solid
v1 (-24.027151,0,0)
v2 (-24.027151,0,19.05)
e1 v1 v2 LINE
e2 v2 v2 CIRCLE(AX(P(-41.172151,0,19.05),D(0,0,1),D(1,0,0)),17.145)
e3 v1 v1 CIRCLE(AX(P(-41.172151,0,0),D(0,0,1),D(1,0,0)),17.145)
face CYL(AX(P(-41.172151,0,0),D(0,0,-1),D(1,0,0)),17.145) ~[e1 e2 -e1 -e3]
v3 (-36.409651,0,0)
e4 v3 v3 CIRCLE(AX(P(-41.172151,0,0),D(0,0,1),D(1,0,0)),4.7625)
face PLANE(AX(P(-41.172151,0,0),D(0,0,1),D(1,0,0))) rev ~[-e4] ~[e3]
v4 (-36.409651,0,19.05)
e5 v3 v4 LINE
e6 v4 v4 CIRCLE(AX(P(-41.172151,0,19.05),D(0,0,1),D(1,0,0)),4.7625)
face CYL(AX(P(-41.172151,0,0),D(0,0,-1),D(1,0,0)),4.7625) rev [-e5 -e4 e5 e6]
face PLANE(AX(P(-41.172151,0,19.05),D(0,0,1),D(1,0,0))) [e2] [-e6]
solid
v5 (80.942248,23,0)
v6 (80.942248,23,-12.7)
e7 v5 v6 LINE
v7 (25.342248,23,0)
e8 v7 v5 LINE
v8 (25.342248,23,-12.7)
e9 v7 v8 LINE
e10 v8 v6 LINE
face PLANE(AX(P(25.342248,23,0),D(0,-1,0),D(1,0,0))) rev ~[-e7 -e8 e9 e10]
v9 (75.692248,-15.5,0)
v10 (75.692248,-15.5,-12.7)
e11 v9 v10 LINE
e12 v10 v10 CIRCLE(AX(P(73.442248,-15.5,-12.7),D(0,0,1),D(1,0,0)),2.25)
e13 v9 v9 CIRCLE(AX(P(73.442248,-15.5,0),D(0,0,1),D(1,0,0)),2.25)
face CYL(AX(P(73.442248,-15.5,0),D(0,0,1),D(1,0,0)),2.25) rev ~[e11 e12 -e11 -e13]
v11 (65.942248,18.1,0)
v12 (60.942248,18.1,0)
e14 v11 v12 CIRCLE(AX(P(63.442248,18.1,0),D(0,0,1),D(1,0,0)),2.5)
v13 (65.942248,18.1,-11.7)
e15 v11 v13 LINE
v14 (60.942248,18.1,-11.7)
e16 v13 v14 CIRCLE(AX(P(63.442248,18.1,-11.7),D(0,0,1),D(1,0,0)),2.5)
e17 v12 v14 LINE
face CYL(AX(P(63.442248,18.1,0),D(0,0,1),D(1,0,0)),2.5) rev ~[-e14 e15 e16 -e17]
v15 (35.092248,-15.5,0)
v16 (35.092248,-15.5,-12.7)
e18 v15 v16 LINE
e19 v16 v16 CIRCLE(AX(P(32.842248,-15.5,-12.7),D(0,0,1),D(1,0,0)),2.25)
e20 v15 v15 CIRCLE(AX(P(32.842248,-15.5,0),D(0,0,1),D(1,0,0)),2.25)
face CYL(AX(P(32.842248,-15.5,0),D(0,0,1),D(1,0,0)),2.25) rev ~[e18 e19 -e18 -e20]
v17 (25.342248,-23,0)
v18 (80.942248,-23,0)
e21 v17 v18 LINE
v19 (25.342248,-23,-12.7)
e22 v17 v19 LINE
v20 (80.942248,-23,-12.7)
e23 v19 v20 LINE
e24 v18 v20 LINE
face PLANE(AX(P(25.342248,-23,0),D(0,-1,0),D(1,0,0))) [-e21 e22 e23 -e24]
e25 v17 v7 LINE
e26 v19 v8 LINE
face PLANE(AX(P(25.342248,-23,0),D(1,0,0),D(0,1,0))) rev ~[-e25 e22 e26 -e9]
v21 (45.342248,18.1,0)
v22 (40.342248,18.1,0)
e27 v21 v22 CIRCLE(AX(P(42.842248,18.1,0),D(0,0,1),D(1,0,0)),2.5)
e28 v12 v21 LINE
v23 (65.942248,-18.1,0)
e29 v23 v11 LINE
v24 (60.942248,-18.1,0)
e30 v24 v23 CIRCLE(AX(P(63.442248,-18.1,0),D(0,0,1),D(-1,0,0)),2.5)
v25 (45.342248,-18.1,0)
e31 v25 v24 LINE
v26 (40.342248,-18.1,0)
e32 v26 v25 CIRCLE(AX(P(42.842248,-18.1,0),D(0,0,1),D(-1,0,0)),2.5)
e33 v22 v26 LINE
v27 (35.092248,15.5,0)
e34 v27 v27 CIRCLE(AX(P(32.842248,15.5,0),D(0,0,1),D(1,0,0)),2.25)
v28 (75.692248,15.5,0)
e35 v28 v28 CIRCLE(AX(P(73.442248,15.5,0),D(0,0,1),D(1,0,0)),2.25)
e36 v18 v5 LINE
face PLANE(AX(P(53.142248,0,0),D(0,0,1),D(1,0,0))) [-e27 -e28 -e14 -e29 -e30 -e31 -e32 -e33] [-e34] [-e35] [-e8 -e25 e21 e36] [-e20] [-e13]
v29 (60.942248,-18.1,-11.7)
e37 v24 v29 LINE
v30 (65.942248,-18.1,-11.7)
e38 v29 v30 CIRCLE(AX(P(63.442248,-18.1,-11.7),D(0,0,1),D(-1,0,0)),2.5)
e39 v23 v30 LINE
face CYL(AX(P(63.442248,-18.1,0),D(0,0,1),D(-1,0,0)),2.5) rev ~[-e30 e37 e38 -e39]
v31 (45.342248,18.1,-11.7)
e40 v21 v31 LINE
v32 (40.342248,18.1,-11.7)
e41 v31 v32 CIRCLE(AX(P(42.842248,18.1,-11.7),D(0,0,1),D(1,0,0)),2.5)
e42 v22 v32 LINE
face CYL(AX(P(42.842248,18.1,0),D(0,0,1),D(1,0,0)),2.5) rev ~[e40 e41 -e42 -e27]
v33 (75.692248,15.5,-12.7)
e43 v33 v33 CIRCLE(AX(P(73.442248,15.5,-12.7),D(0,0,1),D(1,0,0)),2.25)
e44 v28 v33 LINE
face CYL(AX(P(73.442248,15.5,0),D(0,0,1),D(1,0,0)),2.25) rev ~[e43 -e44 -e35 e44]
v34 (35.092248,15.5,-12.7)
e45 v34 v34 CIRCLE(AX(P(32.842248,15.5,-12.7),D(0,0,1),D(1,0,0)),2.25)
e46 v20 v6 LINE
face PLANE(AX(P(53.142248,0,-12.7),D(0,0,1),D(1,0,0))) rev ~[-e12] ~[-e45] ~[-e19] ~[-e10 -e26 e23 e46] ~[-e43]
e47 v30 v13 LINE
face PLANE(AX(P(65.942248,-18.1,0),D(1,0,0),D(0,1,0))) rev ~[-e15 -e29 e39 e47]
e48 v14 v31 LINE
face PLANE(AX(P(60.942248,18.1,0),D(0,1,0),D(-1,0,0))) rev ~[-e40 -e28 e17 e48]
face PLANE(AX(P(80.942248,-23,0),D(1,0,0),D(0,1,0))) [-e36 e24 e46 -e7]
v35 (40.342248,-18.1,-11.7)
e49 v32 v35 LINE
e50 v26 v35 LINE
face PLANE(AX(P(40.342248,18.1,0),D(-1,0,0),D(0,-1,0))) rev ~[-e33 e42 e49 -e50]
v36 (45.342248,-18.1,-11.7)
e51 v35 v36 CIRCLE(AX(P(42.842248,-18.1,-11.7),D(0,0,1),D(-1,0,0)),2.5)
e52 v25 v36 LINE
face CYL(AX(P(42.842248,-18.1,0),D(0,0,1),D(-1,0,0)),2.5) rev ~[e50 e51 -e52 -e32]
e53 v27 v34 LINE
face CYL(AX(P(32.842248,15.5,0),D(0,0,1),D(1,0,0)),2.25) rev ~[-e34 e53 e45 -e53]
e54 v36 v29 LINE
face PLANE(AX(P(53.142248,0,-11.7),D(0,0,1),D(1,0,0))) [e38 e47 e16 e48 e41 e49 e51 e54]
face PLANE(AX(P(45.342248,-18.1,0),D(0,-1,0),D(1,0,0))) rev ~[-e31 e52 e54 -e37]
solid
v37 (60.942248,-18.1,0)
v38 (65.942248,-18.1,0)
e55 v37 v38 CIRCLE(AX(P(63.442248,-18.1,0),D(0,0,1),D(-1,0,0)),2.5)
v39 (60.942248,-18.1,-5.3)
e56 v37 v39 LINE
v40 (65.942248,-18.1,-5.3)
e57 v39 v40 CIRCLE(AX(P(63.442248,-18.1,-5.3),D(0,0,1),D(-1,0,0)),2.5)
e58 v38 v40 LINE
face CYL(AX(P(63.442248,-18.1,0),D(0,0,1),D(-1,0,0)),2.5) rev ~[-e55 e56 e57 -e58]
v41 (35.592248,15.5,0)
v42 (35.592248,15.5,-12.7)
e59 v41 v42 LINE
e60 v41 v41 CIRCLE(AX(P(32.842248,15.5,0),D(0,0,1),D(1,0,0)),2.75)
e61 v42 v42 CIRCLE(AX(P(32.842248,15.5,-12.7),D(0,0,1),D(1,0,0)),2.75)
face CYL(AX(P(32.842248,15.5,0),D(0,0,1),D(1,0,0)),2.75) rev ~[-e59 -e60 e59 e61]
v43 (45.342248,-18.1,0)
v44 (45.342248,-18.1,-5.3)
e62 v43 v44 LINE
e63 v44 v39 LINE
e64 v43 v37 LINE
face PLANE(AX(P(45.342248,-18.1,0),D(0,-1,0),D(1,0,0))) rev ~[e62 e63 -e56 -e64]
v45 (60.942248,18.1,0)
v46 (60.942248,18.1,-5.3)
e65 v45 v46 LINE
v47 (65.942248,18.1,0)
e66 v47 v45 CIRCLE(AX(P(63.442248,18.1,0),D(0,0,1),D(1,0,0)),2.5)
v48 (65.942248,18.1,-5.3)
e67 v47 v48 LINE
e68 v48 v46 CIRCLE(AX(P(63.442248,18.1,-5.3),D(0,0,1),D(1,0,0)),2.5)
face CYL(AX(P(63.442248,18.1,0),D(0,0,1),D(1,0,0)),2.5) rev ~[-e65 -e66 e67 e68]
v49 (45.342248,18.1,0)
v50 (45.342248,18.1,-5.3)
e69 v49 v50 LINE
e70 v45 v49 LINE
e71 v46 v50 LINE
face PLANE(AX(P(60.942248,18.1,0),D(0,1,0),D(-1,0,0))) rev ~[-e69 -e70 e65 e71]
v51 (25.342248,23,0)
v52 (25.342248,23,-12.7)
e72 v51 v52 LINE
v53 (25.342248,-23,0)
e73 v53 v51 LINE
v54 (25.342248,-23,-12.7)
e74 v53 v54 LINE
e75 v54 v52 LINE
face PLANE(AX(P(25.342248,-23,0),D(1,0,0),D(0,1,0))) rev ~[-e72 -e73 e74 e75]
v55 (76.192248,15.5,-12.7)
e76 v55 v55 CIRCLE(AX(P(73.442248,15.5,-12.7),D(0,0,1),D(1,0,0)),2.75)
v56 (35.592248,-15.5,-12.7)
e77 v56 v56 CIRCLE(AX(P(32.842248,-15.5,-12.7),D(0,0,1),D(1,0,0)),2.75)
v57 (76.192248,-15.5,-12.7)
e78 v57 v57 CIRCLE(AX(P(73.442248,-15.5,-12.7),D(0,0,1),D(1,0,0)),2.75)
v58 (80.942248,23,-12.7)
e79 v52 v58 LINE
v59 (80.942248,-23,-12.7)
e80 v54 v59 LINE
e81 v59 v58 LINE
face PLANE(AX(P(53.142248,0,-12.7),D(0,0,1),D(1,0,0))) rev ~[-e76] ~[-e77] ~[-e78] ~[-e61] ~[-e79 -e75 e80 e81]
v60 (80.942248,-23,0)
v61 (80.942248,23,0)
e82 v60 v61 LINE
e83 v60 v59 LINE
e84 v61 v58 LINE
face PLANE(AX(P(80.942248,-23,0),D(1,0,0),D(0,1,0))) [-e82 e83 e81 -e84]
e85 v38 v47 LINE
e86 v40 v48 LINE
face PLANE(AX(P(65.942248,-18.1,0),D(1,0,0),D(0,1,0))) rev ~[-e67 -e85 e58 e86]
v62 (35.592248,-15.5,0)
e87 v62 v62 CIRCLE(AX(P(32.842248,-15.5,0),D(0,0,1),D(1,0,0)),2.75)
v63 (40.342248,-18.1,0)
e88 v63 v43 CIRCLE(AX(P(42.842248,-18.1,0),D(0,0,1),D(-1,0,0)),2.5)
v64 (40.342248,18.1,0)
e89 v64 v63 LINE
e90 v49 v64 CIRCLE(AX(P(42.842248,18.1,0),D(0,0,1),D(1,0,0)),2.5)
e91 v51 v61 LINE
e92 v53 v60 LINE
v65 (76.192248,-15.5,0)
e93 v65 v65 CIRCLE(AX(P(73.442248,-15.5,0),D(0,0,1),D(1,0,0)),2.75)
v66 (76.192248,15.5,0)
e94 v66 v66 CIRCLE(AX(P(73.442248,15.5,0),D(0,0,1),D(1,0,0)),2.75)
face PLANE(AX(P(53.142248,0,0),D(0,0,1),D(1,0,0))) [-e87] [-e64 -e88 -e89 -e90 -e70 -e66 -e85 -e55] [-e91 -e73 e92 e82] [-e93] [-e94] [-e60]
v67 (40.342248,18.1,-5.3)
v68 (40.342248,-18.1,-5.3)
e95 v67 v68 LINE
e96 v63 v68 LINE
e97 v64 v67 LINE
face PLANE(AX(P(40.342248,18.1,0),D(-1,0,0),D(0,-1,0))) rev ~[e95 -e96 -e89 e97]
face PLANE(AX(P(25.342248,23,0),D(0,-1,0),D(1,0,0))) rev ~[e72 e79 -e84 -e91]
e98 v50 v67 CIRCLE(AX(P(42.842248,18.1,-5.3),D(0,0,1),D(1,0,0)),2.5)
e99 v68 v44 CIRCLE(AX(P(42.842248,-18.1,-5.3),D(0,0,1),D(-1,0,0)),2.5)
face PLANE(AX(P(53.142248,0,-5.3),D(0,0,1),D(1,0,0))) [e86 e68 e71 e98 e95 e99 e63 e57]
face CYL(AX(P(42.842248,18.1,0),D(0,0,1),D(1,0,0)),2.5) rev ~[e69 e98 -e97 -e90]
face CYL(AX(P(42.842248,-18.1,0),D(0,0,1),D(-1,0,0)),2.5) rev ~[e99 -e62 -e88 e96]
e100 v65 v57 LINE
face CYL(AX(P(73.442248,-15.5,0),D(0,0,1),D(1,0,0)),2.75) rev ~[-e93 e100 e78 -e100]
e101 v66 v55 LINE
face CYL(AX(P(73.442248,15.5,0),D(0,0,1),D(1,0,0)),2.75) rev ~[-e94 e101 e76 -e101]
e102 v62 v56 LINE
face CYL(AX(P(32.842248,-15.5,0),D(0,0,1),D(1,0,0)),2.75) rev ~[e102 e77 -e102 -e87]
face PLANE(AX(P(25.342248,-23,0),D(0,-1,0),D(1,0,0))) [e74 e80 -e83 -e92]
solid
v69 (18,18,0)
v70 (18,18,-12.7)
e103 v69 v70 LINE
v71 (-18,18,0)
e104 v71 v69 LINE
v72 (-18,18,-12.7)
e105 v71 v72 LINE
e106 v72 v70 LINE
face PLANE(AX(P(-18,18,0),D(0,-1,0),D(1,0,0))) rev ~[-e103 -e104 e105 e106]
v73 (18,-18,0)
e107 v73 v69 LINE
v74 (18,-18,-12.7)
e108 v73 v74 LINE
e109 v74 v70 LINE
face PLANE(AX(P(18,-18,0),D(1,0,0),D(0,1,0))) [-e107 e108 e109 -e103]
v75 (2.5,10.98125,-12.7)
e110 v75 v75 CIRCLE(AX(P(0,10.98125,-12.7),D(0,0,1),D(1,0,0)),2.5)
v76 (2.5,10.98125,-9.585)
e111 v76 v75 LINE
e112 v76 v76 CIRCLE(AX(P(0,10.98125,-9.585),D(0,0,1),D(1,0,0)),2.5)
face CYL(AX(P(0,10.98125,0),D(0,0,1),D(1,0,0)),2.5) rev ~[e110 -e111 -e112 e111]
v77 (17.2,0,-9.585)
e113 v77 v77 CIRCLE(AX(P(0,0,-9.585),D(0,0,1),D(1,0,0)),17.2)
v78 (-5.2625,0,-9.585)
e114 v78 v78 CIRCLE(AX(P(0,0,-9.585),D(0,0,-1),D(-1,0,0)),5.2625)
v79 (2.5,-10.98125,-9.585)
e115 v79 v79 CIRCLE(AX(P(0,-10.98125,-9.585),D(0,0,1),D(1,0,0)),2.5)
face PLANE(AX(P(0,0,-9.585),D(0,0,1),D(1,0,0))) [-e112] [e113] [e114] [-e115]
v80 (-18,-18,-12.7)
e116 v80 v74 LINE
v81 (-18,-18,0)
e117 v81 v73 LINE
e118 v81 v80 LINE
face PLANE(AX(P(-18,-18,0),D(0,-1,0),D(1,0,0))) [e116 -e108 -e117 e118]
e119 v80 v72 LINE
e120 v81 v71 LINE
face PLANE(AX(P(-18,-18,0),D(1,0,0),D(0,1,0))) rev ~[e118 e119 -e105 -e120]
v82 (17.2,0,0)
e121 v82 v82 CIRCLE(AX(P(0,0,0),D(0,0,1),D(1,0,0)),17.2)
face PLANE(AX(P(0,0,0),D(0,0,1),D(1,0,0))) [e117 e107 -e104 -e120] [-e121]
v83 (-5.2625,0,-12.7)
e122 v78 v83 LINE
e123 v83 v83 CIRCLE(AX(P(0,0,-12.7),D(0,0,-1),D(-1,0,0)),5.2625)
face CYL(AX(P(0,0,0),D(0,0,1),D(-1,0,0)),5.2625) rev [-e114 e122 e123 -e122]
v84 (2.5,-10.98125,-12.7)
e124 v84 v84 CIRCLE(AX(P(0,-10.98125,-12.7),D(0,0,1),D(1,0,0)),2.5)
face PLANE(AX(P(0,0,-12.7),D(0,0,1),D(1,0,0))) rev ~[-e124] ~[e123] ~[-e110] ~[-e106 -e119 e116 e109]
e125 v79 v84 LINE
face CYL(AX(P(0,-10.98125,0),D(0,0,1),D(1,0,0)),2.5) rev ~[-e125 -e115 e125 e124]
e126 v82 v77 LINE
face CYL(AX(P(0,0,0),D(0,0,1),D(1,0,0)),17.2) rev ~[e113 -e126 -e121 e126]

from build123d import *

# Parameters (mm, degrees)
F0_W     = 36
F0_H     = 36
F0_R     = 2.5
F1_DEPTH = 12.7
F2_DEPTH = 9.585
F3_W     = 55.6
F3_H     = 46
F3_R     = 2.75
F3_R_2   = 2.25
F4_DEPTH = 12.7
F5_DEPTH = 11.7
F6_R     = 17.145
F6_R_2   = 4.7625
F7_DEPTH = 19.05
F8_DEPTH = 12.7
F9_DEPTH = 5.3


# Not quite as in the source:
# - a length typed as a fraction of an inch, garbled in the dataset ("3 / 203.2 mm" for 3/8 in), is restored


with BuildPart() as f1:
    # F0 (on Top) → F1 (new body)
    with BuildSketch(Plane.XY):
        Rectangle(F0_W, F0_H)
        with BuildLine():
            ThreePointArc((-17.2, 0), (0, 17.2), (17.2, 0))
            ThreePointArc((17.2, 0), (0, -17.2), (-17.2, 0))
        make_face(mode=Mode.SUBTRACT)
        with BuildLine():
            ThreePointArc((-17.2, 0), (0, -17.2), (17.2, 0))
            ThreePointArc((17.2, 0), (0, 17.2), (-17.2, 0))
        make_face()
        with Locations((0, -10.98125)):
            Circle(F0_R, mode=Mode.SUBTRACT)
        with BuildLine():
            ThreePointArc((5.2625, 0), (0, -5.2625), (-5.2625, 0))
            ThreePointArc((-5.2625, 0), (0, 5.2625), (5.2625, 0))
        make_face(mode=Mode.SUBTRACT)
        with Locations((0, 10.98125)):
            Circle(F0_R, mode=Mode.SUBTRACT)
    extrude(amount=-F1_DEPTH)

    # F0 (on Top) → F2 (cut)
    with BuildSketch(Plane.XY):
        with BuildLine():
            ThreePointArc((-17.2, 0), (0, -17.2), (17.2, 0))
            ThreePointArc((17.2, 0), (0, 17.2), (-17.2, 0))
        make_face()
        with Locations((0, -10.98125)):
            Circle(F0_R, mode=Mode.SUBTRACT)
        with BuildLine():
            ThreePointArc((5.2625, 0), (0, -5.2625), (-5.2625, 0))
            ThreePointArc((-5.2625, 0), (0, 5.2625), (5.2625, 0))
        make_face(mode=Mode.SUBTRACT)
        with Locations((0, 10.98125)):
            Circle(F0_R, mode=Mode.SUBTRACT)
    extrude(amount=-F2_DEPTH, mode=Mode.SUBTRACT)


with BuildPart() as f4:
    # F3 (on Top) → F4 (new body)
    with BuildSketch(Plane.XY):
        with Locations((53.1422479868, 0)):
            Rectangle(F3_W, F3_H)
        with Locations((32.8422479868, -15.5)):
            Circle(F3_R, mode=Mode.SUBTRACT)
        with Locations((73.4422479868, -15.5)):
            Circle(F3_R, mode=Mode.SUBTRACT)
        with BuildLine():
            Line((40.3422479868, -18.1), (40.3422479868, 18.1))
            ThreePointArc((40.3422479868, 18.1), (42.8422479868, 20.6), (45.3422479868, 18.1))
            Line((45.3422479868, 18.1), (60.9422479868, 18.1))
            ThreePointArc((60.9422479868, 18.1), (63.4422479868, 20.6), (65.9422479868, 18.1))
            Line((65.9422479868, 18.1), (65.9422479868, -18.1))
            ThreePointArc((65.9422479868, -18.1), (63.4422479868, -20.6), (60.9422479868, -18.1))
            Line((60.9422479868, -18.1), (45.3422479868, -18.1))
            ThreePointArc((45.3422479868, -18.1), (42.8422479868, -20.6), (40.3422479868, -18.1))
        make_face(mode=Mode.SUBTRACT)
        with Locations((32.8422479868, 15.5)):
            Circle(F3_R, mode=Mode.SUBTRACT)
        with Locations((73.4422479868, 15.5)):
            Circle(F3_R, mode=Mode.SUBTRACT)
        with BuildLine():
            ThreePointArc((45.3422479868, 18.1), (42.8422479868, 20.6), (40.3422479868, 18.1))
            Line((40.3422479868, 18.1), (40.3422479868, -18.1))
            ThreePointArc((40.3422479868, -18.1), (42.8422479868, -20.6), (45.3422479868, -18.1))
            Line((45.3422479868, -18.1), (60.9422479868, -18.1))
            ThreePointArc((60.9422479868, -18.1), (63.4422479868, -20.6), (65.9422479868, -18.1))
            Line((65.9422479868, -18.1), (65.9422479868, 18.1))
            ThreePointArc((65.9422479868, 18.1), (63.4422479868, 20.6), (60.9422479868, 18.1))
            Line((60.9422479868, 18.1), (45.3422479868, 18.1))
        make_face()
        with Locations((32.8422479868, 15.5)):
            Circle(F3_R)
        with Locations((32.8422479868, 15.5)):
            Circle(F3_R_2, mode=Mode.SUBTRACT)
        with Locations((32.8422479868, -15.5)):
            Circle(F3_R)
        with Locations((32.8422479868, -15.5)):
            Circle(F3_R_2, mode=Mode.SUBTRACT)
        with Locations((73.4422479868, -15.5)):
            Circle(F3_R)
        with Locations((73.4422479868, -15.5)):
            Circle(F3_R_2, mode=Mode.SUBTRACT)
        with Locations((73.4422479868, 15.5)):
            Circle(F3_R)
        with Locations((73.4422479868, 15.5)):
            Circle(F3_R_2, mode=Mode.SUBTRACT)
    extrude(amount=-F4_DEPTH)

    # F3 (on Top) → F5 (cut)
    with BuildSketch(Plane.XY):
        with BuildLine():
            ThreePointArc((45.3422479868, 18.1), (42.8422479868, 20.6), (40.3422479868, 18.1))
            Line((40.3422479868, 18.1), (40.3422479868, -18.1))
            ThreePointArc((40.3422479868, -18.1), (42.8422479868, -20.6), (45.3422479868, -18.1))
            Line((45.3422479868, -18.1), (60.9422479868, -18.1))
            ThreePointArc((60.9422479868, -18.1), (63.4422479868, -20.6), (65.9422479868, -18.1))
            Line((65.9422479868, -18.1), (65.9422479868, 18.1))
            ThreePointArc((65.9422479868, 18.1), (63.4422479868, 20.6), (60.9422479868, 18.1))
            Line((60.9422479868, 18.1), (45.3422479868, 18.1))
        make_face()
    extrude(amount=-F5_DEPTH, mode=Mode.SUBTRACT)


with BuildPart() as f7:
    # F6 (on Top) → F7 (new body)
    with BuildSketch(Plane.XY):
        with Locations((-41.1721505225, 0)):
            Circle(F6_R)
        with Locations((-41.1721505225, 0)):
            Circle(F6_R_2, mode=Mode.SUBTRACT)
    extrude(amount=F7_DEPTH)


with BuildPart() as f8:
    # F3 (on Top) → F8 (new body)
    with BuildSketch(Plane.XY):
        with Locations((53.1422479868, 0)):
            Rectangle(F3_W, F3_H)
        with Locations((32.8422479868, -15.5)):
            Circle(F3_R, mode=Mode.SUBTRACT)
        with Locations((73.4422479868, -15.5)):
            Circle(F3_R, mode=Mode.SUBTRACT)
        with BuildLine():
            Line((40.3422479868, -18.1), (40.3422479868, 18.1))
            ThreePointArc((40.3422479868, 18.1), (42.8422479868, 20.6), (45.3422479868, 18.1))
            Line((45.3422479868, 18.1), (60.9422479868, 18.1))
            ThreePointArc((60.9422479868, 18.1), (63.4422479868, 20.6), (65.9422479868, 18.1))
            Line((65.9422479868, 18.1), (65.9422479868, -18.1))
            ThreePointArc((65.9422479868, -18.1), (63.4422479868, -20.6), (60.9422479868, -18.1))
            Line((60.9422479868, -18.1), (45.3422479868, -18.1))
            ThreePointArc((45.3422479868, -18.1), (42.8422479868, -20.6), (40.3422479868, -18.1))
        make_face(mode=Mode.SUBTRACT)
        with Locations((32.8422479868, 15.5)):
            Circle(F3_R, mode=Mode.SUBTRACT)
        with Locations((73.4422479868, 15.5)):
            Circle(F3_R, mode=Mode.SUBTRACT)
        with BuildLine():
            ThreePointArc((45.3422479868, 18.1), (42.8422479868, 20.6), (40.3422479868, 18.1))
            Line((40.3422479868, 18.1), (40.3422479868, -18.1))
            ThreePointArc((40.3422479868, -18.1), (42.8422479868, -20.6), (45.3422479868, -18.1))
            Line((45.3422479868, -18.1), (60.9422479868, -18.1))
            ThreePointArc((60.9422479868, -18.1), (63.4422479868, -20.6), (65.9422479868, -18.1))
            Line((65.9422479868, -18.1), (65.9422479868, 18.1))
            ThreePointArc((65.9422479868, 18.1), (63.4422479868, 20.6), (60.9422479868, 18.1))
            Line((60.9422479868, 18.1), (45.3422479868, 18.1))
        make_face()
    extrude(amount=-F8_DEPTH)

    # F3 (on Top) → F9 (cut)
    with BuildSketch(Plane.XY):
        with BuildLine():
            ThreePointArc((45.3422479868, 18.1), (42.8422479868, 20.6), (40.3422479868, 18.1))
            Line((40.3422479868, 18.1), (40.3422479868, -18.1))
            ThreePointArc((40.3422479868, -18.1), (42.8422479868, -20.6), (45.3422479868, -18.1))
            Line((45.3422479868, -18.1), (60.9422479868, -18.1))
            ThreePointArc((60.9422479868, -18.1), (63.4422479868, -20.6), (65.9422479868, -18.1))
            Line((65.9422479868, -18.1), (65.9422479868, 18.1))
            ThreePointArc((65.9422479868, 18.1), (63.4422479868, 20.6), (60.9422479868, 18.1))
            Line((60.9422479868, 18.1), (45.3422479868, 18.1))
        make_face()
    extrude(amount=-F9_DEPTH, mode=Mode.SUBTRACT)


solid = Compound([f1.part, f4.part, f7.part, f8.part])
